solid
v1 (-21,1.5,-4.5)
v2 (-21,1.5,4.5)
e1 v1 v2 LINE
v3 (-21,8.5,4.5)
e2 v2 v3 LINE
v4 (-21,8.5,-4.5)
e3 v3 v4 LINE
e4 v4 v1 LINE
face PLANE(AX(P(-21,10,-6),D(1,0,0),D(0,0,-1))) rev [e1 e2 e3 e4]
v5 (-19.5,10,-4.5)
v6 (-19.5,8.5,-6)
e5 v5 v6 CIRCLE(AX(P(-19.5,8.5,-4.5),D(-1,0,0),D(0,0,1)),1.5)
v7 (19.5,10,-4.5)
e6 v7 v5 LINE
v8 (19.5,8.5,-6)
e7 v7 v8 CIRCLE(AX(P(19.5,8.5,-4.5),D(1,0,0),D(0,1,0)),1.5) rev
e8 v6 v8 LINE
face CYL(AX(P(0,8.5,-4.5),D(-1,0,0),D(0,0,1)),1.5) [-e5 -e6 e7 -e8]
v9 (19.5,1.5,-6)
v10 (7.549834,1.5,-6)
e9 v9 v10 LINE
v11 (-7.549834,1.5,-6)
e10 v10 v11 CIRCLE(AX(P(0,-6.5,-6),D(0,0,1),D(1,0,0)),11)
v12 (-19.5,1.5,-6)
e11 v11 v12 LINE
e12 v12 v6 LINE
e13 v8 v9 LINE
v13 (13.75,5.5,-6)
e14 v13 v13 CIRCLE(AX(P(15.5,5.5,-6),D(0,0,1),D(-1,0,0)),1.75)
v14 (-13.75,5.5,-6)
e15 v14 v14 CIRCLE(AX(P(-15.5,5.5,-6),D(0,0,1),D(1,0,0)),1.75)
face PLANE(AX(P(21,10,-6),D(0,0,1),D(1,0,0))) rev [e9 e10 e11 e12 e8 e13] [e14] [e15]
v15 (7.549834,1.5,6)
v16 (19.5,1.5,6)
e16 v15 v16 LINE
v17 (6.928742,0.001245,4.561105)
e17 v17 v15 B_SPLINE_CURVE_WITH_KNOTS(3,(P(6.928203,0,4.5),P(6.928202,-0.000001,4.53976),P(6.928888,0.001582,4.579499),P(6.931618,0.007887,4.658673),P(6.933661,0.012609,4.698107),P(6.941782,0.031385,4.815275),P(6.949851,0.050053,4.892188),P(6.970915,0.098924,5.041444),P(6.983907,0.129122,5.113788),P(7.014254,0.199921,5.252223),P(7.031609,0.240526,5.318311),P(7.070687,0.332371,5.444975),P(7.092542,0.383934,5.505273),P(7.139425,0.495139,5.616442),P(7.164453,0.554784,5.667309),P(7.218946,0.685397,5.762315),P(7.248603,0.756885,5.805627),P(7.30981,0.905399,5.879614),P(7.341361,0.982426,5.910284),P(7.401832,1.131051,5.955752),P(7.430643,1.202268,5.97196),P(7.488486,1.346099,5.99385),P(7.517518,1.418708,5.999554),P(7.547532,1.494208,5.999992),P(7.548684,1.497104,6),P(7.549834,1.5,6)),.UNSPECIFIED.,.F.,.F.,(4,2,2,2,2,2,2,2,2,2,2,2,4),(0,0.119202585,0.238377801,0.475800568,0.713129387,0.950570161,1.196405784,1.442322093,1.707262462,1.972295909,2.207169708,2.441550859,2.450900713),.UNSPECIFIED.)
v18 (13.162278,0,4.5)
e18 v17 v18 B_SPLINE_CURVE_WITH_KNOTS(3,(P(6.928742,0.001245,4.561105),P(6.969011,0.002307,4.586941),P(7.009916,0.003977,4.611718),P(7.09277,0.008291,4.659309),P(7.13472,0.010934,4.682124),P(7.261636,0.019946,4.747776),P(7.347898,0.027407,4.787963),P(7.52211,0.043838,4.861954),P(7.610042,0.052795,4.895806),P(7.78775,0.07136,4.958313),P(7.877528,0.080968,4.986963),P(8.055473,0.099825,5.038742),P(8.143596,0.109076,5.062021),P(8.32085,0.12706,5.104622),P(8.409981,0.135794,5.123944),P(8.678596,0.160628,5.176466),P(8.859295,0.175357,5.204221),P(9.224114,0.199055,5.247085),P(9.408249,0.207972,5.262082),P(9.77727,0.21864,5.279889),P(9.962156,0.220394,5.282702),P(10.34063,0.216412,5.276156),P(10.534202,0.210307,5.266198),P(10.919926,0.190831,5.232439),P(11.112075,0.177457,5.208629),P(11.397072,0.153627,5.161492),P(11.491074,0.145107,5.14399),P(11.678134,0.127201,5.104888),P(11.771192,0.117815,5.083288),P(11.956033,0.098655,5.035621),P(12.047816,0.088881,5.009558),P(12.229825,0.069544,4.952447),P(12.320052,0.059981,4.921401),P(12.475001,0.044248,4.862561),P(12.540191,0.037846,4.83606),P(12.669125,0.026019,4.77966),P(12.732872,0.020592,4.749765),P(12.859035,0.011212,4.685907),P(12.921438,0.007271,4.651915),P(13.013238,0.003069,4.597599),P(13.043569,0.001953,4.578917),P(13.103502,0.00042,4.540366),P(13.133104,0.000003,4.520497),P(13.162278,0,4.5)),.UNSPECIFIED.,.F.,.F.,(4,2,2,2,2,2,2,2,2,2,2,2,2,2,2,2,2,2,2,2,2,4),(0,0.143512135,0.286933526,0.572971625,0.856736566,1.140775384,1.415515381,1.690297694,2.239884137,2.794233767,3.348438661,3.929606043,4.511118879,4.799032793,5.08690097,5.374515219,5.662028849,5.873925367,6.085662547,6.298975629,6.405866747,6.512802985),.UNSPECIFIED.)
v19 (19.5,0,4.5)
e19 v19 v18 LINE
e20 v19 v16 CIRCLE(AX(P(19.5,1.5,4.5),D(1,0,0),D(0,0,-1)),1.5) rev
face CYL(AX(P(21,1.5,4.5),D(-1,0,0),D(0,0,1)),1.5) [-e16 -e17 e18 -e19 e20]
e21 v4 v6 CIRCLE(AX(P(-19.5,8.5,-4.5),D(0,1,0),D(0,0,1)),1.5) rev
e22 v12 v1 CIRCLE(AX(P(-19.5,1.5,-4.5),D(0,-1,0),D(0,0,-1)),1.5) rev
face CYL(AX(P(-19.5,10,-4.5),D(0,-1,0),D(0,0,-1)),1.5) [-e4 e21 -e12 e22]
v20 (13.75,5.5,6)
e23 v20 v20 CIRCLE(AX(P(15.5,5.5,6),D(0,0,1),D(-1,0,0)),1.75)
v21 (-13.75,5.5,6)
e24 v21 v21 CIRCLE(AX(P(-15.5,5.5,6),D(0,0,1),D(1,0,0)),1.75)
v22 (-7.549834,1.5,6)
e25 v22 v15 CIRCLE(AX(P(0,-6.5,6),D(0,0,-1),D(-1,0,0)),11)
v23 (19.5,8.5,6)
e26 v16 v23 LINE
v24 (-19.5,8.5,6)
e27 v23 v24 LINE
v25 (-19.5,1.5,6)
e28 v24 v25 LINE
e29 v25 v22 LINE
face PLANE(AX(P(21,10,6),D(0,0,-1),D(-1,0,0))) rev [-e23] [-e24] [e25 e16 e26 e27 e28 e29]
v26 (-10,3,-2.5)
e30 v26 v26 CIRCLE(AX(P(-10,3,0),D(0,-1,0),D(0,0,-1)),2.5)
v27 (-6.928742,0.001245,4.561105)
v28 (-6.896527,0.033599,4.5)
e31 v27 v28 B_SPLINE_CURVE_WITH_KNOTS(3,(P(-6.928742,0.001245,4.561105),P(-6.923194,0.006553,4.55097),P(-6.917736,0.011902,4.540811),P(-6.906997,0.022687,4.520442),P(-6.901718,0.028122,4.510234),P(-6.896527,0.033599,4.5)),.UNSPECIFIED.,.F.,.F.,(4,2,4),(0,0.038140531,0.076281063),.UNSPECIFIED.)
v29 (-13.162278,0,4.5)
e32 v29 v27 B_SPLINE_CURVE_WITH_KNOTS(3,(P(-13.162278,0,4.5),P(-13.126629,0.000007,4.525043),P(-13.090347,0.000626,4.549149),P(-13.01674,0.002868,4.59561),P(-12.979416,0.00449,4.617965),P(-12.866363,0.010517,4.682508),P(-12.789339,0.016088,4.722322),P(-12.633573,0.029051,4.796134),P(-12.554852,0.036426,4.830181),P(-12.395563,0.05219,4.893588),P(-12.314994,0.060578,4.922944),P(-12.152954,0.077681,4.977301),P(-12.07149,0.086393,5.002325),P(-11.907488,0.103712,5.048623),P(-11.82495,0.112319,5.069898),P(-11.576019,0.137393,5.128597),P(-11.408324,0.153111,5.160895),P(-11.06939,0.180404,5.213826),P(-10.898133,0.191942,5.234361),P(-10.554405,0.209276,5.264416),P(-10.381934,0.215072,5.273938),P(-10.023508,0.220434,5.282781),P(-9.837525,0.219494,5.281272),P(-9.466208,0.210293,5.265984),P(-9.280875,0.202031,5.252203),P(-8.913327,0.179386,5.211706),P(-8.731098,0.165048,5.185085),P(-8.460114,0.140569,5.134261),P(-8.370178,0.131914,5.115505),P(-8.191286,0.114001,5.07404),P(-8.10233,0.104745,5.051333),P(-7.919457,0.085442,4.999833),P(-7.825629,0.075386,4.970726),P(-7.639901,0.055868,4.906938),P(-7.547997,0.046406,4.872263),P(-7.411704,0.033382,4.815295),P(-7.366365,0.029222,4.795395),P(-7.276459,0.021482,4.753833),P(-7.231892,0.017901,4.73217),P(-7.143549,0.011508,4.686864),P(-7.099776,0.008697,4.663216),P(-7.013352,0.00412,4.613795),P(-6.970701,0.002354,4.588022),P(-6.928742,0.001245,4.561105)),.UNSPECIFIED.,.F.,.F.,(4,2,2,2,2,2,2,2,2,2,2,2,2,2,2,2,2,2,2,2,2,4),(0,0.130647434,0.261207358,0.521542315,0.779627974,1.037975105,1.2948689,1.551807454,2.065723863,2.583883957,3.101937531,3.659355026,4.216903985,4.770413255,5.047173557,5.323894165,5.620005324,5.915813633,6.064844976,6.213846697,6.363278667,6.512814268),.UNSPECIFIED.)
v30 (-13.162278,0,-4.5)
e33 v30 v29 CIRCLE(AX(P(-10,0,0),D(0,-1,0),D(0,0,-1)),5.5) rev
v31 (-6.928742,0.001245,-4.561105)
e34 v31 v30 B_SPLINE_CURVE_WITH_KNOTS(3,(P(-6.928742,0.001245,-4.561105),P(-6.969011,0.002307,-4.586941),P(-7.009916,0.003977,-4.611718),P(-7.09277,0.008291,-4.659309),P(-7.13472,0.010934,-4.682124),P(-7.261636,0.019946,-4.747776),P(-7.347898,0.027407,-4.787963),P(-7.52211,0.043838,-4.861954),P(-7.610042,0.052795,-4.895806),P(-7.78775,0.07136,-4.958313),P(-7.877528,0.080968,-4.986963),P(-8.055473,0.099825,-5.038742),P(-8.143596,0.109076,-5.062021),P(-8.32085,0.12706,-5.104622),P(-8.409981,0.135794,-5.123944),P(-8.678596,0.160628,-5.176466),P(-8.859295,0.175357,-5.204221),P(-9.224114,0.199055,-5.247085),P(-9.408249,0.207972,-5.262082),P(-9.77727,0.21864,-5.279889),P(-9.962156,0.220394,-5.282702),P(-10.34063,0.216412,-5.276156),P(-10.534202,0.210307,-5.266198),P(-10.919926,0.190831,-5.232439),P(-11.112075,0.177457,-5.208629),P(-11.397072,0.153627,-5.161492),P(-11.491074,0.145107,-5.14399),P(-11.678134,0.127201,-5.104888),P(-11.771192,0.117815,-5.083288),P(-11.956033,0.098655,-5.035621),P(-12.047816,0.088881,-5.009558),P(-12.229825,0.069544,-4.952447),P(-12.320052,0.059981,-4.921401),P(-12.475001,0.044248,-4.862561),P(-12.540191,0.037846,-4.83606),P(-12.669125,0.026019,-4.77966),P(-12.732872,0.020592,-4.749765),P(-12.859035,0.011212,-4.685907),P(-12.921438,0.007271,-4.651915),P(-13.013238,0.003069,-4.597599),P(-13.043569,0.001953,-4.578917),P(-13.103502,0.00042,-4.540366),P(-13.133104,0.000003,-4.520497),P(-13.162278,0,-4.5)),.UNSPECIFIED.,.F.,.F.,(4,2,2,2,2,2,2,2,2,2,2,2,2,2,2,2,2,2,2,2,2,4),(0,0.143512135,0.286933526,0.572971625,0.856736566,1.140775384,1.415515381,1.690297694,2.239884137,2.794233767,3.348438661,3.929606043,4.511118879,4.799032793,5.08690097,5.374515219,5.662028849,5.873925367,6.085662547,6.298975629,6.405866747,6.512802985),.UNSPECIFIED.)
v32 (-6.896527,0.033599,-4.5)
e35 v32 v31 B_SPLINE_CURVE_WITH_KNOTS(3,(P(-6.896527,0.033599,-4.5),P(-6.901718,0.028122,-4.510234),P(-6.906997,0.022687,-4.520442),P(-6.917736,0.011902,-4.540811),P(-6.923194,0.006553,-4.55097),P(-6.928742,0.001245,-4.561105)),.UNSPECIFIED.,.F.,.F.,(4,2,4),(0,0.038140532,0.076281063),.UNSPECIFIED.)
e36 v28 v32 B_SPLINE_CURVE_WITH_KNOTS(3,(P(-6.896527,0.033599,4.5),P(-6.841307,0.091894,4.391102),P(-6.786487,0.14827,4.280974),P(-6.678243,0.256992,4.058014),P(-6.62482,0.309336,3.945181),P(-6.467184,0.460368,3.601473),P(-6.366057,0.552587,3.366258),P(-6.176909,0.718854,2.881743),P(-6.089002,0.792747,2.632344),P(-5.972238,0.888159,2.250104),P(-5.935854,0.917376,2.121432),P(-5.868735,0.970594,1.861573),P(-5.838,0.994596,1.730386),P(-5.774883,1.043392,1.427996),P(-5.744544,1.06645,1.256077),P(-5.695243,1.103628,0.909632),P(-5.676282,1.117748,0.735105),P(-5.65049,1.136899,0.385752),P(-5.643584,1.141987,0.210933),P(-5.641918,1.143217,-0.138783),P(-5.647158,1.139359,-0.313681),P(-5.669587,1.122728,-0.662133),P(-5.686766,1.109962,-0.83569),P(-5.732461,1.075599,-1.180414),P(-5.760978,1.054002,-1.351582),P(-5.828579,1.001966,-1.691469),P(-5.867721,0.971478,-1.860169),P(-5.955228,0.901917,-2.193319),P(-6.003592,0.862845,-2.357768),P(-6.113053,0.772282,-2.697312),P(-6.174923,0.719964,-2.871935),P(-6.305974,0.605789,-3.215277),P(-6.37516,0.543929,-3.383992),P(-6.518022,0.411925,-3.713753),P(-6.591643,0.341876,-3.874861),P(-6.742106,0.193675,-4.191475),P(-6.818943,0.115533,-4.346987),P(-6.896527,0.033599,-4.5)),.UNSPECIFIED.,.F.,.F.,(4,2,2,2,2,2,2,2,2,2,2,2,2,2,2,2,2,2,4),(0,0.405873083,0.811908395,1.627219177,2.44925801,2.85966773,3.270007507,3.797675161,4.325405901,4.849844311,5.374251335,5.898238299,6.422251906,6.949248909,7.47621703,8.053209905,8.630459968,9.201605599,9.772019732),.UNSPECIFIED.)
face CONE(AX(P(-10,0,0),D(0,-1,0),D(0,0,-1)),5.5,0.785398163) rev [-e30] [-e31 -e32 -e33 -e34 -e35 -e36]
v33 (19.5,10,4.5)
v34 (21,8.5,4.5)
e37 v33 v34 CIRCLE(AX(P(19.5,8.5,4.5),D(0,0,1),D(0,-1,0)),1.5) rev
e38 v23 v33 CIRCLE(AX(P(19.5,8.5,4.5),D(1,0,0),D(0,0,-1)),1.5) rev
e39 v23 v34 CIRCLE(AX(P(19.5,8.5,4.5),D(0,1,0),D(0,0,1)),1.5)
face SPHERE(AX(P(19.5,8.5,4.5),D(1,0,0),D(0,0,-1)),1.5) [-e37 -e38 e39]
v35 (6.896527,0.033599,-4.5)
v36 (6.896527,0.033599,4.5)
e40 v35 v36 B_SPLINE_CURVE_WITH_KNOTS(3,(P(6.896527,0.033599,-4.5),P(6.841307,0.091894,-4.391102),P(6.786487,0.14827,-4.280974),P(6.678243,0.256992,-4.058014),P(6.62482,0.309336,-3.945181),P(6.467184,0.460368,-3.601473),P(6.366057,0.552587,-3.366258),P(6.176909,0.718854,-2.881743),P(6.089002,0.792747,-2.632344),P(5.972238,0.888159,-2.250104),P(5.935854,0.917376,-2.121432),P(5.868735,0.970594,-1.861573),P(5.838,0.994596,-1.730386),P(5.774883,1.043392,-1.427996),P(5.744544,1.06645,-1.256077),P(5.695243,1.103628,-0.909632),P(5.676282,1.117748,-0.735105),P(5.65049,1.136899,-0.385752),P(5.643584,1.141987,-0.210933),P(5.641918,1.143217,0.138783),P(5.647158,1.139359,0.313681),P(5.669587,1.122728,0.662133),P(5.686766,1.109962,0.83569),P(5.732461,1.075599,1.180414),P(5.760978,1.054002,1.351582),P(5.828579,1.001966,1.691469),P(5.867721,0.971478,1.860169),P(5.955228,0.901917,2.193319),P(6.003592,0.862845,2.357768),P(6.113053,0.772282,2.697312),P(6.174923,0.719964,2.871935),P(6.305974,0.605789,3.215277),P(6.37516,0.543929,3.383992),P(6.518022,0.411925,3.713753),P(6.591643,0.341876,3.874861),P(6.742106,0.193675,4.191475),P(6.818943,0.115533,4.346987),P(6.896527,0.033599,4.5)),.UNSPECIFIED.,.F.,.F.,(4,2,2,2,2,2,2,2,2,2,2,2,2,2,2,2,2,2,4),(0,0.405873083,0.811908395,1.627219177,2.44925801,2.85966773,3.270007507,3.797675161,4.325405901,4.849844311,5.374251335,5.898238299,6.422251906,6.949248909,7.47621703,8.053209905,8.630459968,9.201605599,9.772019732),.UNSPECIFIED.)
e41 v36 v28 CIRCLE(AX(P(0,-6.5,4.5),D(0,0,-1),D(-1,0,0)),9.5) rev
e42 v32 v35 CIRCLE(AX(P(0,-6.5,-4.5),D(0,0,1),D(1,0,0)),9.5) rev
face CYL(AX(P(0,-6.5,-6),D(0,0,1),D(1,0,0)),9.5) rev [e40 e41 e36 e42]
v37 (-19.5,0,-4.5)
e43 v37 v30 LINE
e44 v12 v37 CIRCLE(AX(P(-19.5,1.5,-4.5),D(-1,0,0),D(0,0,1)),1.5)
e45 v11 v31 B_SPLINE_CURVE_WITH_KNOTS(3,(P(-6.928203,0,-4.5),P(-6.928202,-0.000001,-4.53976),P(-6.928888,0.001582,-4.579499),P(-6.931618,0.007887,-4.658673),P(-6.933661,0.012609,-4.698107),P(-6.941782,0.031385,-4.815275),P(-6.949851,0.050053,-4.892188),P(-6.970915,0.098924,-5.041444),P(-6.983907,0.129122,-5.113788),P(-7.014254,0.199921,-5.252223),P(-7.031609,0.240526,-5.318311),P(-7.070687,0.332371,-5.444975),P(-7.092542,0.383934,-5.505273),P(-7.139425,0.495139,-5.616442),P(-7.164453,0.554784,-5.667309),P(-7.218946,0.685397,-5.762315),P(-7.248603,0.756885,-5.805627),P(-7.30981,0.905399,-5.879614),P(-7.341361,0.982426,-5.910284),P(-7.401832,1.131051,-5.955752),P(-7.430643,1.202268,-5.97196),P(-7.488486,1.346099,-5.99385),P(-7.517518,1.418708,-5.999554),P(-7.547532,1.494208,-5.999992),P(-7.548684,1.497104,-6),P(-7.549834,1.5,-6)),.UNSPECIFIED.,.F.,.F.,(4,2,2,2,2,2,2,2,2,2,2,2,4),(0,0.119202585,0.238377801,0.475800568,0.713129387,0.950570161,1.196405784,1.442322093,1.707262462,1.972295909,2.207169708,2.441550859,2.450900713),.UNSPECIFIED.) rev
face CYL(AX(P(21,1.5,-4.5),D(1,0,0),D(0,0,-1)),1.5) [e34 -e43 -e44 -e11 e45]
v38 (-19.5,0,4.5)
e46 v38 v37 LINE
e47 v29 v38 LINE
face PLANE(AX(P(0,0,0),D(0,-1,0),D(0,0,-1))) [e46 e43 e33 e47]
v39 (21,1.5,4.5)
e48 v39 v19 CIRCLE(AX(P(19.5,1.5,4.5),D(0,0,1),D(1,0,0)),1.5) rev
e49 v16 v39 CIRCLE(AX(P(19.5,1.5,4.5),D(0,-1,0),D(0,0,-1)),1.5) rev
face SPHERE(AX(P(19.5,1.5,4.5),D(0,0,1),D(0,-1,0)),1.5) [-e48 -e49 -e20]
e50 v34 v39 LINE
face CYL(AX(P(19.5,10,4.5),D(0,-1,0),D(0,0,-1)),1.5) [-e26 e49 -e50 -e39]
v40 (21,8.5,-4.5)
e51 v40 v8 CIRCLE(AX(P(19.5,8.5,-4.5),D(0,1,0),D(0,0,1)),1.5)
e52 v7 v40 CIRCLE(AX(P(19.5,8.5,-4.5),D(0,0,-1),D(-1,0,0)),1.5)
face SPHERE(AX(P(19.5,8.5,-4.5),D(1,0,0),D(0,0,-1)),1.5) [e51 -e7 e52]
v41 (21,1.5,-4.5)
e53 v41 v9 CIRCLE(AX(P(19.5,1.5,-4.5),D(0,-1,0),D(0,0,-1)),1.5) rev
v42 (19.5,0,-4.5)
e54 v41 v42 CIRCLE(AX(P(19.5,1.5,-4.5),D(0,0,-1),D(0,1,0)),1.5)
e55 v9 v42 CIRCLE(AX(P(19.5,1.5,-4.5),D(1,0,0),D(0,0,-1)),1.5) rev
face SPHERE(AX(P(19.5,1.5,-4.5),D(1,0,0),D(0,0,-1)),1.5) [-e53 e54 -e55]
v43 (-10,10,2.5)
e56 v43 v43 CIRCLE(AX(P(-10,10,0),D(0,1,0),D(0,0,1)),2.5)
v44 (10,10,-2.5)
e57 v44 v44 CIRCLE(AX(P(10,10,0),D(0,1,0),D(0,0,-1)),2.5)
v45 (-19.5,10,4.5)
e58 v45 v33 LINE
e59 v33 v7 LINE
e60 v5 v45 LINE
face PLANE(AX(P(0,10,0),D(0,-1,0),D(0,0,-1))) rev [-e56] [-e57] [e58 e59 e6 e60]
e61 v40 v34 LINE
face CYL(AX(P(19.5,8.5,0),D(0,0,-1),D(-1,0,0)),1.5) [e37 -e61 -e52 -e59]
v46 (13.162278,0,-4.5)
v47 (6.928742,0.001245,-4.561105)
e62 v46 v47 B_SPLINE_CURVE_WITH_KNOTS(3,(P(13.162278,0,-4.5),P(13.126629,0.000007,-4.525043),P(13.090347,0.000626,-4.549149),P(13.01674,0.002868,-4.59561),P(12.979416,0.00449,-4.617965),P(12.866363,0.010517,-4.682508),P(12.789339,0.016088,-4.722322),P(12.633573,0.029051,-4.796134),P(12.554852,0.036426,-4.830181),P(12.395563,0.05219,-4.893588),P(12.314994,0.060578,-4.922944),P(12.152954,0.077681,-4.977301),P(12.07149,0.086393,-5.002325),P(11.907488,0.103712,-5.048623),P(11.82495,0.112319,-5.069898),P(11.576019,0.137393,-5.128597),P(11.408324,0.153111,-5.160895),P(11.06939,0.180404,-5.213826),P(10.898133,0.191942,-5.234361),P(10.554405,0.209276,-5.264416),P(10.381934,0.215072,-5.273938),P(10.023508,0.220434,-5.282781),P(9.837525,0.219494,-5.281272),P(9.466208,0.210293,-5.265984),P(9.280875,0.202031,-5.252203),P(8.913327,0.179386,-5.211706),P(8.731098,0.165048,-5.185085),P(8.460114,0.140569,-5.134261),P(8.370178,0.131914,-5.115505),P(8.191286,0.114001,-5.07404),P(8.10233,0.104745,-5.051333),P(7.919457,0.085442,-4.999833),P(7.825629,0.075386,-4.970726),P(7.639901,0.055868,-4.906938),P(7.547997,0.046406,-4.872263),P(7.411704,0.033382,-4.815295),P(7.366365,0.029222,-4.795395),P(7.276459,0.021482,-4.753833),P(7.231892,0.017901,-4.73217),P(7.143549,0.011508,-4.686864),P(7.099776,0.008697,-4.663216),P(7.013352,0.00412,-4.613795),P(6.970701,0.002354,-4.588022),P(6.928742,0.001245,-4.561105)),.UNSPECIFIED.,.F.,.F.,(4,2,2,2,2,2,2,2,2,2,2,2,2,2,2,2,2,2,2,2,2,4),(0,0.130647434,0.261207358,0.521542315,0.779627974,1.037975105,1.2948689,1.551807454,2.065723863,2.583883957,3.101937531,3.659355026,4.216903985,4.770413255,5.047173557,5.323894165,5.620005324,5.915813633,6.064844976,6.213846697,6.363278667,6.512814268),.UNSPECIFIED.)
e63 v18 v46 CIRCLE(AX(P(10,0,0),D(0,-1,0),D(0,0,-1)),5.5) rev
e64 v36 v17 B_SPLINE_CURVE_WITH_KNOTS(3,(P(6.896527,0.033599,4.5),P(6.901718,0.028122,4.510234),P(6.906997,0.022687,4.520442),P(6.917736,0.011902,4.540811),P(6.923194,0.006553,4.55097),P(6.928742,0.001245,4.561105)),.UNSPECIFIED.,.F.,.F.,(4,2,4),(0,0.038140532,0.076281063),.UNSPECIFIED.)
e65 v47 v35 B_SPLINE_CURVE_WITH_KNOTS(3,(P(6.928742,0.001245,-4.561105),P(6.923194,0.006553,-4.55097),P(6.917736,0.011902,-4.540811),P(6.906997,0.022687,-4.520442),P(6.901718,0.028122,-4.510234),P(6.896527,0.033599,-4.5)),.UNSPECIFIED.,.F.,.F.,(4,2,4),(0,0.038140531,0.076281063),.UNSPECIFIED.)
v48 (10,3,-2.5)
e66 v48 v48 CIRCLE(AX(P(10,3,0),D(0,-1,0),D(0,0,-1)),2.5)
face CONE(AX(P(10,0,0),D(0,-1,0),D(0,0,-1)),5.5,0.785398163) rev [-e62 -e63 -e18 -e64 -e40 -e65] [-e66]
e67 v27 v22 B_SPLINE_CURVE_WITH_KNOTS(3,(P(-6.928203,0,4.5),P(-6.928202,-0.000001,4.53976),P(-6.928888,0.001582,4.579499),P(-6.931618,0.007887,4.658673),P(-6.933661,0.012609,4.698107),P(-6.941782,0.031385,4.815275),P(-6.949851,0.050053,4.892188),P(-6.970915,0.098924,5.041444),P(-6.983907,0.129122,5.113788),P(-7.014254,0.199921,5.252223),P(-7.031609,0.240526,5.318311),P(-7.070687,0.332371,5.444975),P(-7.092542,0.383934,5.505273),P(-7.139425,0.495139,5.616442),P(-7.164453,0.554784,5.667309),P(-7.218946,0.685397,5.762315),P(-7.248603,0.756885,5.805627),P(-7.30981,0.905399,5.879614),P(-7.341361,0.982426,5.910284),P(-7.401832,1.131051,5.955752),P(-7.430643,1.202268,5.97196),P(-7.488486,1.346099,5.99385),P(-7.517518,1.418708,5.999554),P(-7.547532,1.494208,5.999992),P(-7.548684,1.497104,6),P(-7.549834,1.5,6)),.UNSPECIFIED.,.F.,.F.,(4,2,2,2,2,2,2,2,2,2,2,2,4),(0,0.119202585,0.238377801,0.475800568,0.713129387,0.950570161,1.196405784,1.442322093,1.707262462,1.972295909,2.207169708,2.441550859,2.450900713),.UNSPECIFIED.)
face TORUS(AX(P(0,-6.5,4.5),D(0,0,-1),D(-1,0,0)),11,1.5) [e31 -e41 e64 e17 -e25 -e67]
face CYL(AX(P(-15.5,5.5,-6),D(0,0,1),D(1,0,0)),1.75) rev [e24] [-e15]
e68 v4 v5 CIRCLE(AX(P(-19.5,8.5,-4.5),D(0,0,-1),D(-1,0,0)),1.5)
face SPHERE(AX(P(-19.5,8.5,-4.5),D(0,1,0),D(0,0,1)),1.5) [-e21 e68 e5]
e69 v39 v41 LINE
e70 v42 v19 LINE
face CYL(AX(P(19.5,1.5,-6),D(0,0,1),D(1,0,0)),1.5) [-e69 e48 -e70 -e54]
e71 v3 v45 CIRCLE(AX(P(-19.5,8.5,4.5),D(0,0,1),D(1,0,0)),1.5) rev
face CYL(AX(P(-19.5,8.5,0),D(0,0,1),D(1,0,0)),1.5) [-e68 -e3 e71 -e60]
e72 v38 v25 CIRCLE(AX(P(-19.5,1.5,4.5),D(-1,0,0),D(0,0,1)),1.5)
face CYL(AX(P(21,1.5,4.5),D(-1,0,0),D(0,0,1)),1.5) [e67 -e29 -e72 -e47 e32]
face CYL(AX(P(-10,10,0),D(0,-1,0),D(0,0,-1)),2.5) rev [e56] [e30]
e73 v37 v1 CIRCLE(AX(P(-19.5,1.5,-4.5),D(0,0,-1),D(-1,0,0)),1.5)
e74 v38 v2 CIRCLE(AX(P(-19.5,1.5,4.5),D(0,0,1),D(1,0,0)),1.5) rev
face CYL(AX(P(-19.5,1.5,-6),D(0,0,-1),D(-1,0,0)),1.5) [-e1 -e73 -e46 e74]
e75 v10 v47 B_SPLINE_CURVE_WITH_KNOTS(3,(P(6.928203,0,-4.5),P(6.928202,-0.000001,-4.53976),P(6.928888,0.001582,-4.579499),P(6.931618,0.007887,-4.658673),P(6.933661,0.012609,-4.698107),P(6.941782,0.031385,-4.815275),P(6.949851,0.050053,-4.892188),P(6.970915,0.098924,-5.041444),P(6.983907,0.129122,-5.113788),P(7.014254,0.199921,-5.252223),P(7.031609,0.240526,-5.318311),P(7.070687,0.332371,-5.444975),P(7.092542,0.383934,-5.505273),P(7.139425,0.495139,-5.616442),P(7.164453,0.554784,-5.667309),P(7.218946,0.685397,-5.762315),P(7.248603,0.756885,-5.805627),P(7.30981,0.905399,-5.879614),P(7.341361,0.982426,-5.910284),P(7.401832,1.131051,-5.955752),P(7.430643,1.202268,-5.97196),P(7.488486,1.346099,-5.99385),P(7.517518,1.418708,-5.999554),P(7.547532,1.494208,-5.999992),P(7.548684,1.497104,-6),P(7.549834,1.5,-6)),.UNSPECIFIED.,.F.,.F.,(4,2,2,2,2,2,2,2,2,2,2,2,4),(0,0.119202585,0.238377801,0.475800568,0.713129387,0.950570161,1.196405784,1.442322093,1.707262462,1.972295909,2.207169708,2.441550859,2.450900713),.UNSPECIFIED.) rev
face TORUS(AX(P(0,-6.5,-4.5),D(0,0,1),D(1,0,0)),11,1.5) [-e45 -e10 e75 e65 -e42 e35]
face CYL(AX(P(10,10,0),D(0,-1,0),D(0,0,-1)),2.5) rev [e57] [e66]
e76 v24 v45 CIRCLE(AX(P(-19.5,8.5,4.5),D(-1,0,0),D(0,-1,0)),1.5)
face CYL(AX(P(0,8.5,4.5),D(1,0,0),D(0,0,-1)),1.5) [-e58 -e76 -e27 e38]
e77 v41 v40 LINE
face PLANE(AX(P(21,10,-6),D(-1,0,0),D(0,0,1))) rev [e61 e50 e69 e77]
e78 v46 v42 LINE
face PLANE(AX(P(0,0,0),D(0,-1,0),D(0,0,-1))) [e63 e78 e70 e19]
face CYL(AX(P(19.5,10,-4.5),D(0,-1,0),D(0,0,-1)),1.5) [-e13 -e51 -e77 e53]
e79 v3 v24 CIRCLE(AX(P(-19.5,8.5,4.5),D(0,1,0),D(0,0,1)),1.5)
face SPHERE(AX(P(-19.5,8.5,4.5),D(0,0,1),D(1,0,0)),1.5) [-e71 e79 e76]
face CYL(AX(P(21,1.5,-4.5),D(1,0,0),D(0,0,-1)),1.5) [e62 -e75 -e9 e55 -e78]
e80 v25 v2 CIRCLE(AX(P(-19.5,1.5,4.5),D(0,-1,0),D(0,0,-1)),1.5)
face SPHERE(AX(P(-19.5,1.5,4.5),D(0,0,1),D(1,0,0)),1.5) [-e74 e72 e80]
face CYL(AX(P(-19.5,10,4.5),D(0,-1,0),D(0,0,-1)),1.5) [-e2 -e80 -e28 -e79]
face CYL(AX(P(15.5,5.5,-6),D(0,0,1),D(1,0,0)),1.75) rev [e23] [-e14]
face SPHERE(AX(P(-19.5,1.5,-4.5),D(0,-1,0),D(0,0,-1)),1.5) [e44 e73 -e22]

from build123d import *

# Parameters (mm, degrees)
SKETCH1_W        = 42
SKETCH1_H        = 12
SKETCH1_R        = 2.5
MAIN_BOSS_DEPTH  = 10
SKETCH2_R        = 1.75
SKETCH2_R_2      = 9.5
SIDE_HOLES_DEPTH = 27.172504657
FILLET2_R        = 1.5
CHAMFER2_SIZE    = 3


with BuildPart() as part:
    # Sketch1 → main boss (new body)
    with BuildSketch(Plane(origin=(0, 0, 0), x_dir=(1, 0, 0), z_dir=(0, 1, 0))):
        Rectangle(SKETCH1_W, SKETCH1_H)
        with Locations(Location((-10, 0, 0), (0, 0, 270))):
            Circle(SKETCH1_R, mode=Mode.SUBTRACT)
        with Locations(Location((10, 0, 0), (0, 0, 90))):
            Circle(SKETCH1_R, mode=Mode.SUBTRACT)
    extrude(amount=MAIN_BOSS_DEPTH)

    # Sketch2 → side holes (cut, through all)
    with BuildSketch(Plane.XY.offset(6)):
        with Locations((-15.5, 5.5)):
            Circle(SKETCH2_R)
        with Locations(Location((15.5, 5.5, 0), (0, 0, 180))):
            Circle(SKETCH2_R)
        with Locations((0, -6.5)):
            Circle(SKETCH2_R_2)
    extrude(amount=-SIDE_HOLES_DEPTH, mode=Mode.SUBTRACT)

    # Fillet2
    fillet2_edges = [part.edges().sort_by_distance(p)[0] for p in [
        (21, 10, 0),
        (0, 10, -6),
        (-13.964101615, 0, -6),
        (13.964101615, 0, 6),
        (0, 3, -6),
        (0, 3, 6),
        (-21, 10, 0),
        (13.964101615, 0, -6),
        (21, 0, 0),
        (-13.964101615, 0, 6),
        (-21, 0, 0),
        (-21, 5, -6),
        (21, 5, -6),
        (21, 5, 6),
        (-21, 5, 6),
        (0, 10, 6),
    ]]
    fillet(fillet2_edges, radius=FILLET2_R)

    # Chamfer2
    # the kernel refuses this chamfer: 3 mm, written as the material it takes off along each edge
    with BuildSketch(Plane(origin=(-10, 0, 0), x_dir=(0, 0, 1), z_dir=(-1, 0, 0))) as chamfer2_piece_1:
        Polygon((2.5 + CHAMFER2_SIZE, 0), (2.5, CHAMFER2_SIZE), (2.5, 0), align=None)
    revolve(axis=Axis((-10, 0, 0), (0, 1, 0)), mode=Mode.SUBTRACT)
    with BuildSketch(Plane(origin=(10, 0, 0), x_dir=(0, 0, -1), z_dir=(1, 0, 0))) as chamfer2_piece_2:
        Polygon((2.5 + CHAMFER2_SIZE, 0), (2.5, CHAMFER2_SIZE), (2.5, 0), align=None)
    revolve(axis=Axis((10, 0, 0), (0, 1, 0)), mode=Mode.SUBTRACT)


solid = part.part
